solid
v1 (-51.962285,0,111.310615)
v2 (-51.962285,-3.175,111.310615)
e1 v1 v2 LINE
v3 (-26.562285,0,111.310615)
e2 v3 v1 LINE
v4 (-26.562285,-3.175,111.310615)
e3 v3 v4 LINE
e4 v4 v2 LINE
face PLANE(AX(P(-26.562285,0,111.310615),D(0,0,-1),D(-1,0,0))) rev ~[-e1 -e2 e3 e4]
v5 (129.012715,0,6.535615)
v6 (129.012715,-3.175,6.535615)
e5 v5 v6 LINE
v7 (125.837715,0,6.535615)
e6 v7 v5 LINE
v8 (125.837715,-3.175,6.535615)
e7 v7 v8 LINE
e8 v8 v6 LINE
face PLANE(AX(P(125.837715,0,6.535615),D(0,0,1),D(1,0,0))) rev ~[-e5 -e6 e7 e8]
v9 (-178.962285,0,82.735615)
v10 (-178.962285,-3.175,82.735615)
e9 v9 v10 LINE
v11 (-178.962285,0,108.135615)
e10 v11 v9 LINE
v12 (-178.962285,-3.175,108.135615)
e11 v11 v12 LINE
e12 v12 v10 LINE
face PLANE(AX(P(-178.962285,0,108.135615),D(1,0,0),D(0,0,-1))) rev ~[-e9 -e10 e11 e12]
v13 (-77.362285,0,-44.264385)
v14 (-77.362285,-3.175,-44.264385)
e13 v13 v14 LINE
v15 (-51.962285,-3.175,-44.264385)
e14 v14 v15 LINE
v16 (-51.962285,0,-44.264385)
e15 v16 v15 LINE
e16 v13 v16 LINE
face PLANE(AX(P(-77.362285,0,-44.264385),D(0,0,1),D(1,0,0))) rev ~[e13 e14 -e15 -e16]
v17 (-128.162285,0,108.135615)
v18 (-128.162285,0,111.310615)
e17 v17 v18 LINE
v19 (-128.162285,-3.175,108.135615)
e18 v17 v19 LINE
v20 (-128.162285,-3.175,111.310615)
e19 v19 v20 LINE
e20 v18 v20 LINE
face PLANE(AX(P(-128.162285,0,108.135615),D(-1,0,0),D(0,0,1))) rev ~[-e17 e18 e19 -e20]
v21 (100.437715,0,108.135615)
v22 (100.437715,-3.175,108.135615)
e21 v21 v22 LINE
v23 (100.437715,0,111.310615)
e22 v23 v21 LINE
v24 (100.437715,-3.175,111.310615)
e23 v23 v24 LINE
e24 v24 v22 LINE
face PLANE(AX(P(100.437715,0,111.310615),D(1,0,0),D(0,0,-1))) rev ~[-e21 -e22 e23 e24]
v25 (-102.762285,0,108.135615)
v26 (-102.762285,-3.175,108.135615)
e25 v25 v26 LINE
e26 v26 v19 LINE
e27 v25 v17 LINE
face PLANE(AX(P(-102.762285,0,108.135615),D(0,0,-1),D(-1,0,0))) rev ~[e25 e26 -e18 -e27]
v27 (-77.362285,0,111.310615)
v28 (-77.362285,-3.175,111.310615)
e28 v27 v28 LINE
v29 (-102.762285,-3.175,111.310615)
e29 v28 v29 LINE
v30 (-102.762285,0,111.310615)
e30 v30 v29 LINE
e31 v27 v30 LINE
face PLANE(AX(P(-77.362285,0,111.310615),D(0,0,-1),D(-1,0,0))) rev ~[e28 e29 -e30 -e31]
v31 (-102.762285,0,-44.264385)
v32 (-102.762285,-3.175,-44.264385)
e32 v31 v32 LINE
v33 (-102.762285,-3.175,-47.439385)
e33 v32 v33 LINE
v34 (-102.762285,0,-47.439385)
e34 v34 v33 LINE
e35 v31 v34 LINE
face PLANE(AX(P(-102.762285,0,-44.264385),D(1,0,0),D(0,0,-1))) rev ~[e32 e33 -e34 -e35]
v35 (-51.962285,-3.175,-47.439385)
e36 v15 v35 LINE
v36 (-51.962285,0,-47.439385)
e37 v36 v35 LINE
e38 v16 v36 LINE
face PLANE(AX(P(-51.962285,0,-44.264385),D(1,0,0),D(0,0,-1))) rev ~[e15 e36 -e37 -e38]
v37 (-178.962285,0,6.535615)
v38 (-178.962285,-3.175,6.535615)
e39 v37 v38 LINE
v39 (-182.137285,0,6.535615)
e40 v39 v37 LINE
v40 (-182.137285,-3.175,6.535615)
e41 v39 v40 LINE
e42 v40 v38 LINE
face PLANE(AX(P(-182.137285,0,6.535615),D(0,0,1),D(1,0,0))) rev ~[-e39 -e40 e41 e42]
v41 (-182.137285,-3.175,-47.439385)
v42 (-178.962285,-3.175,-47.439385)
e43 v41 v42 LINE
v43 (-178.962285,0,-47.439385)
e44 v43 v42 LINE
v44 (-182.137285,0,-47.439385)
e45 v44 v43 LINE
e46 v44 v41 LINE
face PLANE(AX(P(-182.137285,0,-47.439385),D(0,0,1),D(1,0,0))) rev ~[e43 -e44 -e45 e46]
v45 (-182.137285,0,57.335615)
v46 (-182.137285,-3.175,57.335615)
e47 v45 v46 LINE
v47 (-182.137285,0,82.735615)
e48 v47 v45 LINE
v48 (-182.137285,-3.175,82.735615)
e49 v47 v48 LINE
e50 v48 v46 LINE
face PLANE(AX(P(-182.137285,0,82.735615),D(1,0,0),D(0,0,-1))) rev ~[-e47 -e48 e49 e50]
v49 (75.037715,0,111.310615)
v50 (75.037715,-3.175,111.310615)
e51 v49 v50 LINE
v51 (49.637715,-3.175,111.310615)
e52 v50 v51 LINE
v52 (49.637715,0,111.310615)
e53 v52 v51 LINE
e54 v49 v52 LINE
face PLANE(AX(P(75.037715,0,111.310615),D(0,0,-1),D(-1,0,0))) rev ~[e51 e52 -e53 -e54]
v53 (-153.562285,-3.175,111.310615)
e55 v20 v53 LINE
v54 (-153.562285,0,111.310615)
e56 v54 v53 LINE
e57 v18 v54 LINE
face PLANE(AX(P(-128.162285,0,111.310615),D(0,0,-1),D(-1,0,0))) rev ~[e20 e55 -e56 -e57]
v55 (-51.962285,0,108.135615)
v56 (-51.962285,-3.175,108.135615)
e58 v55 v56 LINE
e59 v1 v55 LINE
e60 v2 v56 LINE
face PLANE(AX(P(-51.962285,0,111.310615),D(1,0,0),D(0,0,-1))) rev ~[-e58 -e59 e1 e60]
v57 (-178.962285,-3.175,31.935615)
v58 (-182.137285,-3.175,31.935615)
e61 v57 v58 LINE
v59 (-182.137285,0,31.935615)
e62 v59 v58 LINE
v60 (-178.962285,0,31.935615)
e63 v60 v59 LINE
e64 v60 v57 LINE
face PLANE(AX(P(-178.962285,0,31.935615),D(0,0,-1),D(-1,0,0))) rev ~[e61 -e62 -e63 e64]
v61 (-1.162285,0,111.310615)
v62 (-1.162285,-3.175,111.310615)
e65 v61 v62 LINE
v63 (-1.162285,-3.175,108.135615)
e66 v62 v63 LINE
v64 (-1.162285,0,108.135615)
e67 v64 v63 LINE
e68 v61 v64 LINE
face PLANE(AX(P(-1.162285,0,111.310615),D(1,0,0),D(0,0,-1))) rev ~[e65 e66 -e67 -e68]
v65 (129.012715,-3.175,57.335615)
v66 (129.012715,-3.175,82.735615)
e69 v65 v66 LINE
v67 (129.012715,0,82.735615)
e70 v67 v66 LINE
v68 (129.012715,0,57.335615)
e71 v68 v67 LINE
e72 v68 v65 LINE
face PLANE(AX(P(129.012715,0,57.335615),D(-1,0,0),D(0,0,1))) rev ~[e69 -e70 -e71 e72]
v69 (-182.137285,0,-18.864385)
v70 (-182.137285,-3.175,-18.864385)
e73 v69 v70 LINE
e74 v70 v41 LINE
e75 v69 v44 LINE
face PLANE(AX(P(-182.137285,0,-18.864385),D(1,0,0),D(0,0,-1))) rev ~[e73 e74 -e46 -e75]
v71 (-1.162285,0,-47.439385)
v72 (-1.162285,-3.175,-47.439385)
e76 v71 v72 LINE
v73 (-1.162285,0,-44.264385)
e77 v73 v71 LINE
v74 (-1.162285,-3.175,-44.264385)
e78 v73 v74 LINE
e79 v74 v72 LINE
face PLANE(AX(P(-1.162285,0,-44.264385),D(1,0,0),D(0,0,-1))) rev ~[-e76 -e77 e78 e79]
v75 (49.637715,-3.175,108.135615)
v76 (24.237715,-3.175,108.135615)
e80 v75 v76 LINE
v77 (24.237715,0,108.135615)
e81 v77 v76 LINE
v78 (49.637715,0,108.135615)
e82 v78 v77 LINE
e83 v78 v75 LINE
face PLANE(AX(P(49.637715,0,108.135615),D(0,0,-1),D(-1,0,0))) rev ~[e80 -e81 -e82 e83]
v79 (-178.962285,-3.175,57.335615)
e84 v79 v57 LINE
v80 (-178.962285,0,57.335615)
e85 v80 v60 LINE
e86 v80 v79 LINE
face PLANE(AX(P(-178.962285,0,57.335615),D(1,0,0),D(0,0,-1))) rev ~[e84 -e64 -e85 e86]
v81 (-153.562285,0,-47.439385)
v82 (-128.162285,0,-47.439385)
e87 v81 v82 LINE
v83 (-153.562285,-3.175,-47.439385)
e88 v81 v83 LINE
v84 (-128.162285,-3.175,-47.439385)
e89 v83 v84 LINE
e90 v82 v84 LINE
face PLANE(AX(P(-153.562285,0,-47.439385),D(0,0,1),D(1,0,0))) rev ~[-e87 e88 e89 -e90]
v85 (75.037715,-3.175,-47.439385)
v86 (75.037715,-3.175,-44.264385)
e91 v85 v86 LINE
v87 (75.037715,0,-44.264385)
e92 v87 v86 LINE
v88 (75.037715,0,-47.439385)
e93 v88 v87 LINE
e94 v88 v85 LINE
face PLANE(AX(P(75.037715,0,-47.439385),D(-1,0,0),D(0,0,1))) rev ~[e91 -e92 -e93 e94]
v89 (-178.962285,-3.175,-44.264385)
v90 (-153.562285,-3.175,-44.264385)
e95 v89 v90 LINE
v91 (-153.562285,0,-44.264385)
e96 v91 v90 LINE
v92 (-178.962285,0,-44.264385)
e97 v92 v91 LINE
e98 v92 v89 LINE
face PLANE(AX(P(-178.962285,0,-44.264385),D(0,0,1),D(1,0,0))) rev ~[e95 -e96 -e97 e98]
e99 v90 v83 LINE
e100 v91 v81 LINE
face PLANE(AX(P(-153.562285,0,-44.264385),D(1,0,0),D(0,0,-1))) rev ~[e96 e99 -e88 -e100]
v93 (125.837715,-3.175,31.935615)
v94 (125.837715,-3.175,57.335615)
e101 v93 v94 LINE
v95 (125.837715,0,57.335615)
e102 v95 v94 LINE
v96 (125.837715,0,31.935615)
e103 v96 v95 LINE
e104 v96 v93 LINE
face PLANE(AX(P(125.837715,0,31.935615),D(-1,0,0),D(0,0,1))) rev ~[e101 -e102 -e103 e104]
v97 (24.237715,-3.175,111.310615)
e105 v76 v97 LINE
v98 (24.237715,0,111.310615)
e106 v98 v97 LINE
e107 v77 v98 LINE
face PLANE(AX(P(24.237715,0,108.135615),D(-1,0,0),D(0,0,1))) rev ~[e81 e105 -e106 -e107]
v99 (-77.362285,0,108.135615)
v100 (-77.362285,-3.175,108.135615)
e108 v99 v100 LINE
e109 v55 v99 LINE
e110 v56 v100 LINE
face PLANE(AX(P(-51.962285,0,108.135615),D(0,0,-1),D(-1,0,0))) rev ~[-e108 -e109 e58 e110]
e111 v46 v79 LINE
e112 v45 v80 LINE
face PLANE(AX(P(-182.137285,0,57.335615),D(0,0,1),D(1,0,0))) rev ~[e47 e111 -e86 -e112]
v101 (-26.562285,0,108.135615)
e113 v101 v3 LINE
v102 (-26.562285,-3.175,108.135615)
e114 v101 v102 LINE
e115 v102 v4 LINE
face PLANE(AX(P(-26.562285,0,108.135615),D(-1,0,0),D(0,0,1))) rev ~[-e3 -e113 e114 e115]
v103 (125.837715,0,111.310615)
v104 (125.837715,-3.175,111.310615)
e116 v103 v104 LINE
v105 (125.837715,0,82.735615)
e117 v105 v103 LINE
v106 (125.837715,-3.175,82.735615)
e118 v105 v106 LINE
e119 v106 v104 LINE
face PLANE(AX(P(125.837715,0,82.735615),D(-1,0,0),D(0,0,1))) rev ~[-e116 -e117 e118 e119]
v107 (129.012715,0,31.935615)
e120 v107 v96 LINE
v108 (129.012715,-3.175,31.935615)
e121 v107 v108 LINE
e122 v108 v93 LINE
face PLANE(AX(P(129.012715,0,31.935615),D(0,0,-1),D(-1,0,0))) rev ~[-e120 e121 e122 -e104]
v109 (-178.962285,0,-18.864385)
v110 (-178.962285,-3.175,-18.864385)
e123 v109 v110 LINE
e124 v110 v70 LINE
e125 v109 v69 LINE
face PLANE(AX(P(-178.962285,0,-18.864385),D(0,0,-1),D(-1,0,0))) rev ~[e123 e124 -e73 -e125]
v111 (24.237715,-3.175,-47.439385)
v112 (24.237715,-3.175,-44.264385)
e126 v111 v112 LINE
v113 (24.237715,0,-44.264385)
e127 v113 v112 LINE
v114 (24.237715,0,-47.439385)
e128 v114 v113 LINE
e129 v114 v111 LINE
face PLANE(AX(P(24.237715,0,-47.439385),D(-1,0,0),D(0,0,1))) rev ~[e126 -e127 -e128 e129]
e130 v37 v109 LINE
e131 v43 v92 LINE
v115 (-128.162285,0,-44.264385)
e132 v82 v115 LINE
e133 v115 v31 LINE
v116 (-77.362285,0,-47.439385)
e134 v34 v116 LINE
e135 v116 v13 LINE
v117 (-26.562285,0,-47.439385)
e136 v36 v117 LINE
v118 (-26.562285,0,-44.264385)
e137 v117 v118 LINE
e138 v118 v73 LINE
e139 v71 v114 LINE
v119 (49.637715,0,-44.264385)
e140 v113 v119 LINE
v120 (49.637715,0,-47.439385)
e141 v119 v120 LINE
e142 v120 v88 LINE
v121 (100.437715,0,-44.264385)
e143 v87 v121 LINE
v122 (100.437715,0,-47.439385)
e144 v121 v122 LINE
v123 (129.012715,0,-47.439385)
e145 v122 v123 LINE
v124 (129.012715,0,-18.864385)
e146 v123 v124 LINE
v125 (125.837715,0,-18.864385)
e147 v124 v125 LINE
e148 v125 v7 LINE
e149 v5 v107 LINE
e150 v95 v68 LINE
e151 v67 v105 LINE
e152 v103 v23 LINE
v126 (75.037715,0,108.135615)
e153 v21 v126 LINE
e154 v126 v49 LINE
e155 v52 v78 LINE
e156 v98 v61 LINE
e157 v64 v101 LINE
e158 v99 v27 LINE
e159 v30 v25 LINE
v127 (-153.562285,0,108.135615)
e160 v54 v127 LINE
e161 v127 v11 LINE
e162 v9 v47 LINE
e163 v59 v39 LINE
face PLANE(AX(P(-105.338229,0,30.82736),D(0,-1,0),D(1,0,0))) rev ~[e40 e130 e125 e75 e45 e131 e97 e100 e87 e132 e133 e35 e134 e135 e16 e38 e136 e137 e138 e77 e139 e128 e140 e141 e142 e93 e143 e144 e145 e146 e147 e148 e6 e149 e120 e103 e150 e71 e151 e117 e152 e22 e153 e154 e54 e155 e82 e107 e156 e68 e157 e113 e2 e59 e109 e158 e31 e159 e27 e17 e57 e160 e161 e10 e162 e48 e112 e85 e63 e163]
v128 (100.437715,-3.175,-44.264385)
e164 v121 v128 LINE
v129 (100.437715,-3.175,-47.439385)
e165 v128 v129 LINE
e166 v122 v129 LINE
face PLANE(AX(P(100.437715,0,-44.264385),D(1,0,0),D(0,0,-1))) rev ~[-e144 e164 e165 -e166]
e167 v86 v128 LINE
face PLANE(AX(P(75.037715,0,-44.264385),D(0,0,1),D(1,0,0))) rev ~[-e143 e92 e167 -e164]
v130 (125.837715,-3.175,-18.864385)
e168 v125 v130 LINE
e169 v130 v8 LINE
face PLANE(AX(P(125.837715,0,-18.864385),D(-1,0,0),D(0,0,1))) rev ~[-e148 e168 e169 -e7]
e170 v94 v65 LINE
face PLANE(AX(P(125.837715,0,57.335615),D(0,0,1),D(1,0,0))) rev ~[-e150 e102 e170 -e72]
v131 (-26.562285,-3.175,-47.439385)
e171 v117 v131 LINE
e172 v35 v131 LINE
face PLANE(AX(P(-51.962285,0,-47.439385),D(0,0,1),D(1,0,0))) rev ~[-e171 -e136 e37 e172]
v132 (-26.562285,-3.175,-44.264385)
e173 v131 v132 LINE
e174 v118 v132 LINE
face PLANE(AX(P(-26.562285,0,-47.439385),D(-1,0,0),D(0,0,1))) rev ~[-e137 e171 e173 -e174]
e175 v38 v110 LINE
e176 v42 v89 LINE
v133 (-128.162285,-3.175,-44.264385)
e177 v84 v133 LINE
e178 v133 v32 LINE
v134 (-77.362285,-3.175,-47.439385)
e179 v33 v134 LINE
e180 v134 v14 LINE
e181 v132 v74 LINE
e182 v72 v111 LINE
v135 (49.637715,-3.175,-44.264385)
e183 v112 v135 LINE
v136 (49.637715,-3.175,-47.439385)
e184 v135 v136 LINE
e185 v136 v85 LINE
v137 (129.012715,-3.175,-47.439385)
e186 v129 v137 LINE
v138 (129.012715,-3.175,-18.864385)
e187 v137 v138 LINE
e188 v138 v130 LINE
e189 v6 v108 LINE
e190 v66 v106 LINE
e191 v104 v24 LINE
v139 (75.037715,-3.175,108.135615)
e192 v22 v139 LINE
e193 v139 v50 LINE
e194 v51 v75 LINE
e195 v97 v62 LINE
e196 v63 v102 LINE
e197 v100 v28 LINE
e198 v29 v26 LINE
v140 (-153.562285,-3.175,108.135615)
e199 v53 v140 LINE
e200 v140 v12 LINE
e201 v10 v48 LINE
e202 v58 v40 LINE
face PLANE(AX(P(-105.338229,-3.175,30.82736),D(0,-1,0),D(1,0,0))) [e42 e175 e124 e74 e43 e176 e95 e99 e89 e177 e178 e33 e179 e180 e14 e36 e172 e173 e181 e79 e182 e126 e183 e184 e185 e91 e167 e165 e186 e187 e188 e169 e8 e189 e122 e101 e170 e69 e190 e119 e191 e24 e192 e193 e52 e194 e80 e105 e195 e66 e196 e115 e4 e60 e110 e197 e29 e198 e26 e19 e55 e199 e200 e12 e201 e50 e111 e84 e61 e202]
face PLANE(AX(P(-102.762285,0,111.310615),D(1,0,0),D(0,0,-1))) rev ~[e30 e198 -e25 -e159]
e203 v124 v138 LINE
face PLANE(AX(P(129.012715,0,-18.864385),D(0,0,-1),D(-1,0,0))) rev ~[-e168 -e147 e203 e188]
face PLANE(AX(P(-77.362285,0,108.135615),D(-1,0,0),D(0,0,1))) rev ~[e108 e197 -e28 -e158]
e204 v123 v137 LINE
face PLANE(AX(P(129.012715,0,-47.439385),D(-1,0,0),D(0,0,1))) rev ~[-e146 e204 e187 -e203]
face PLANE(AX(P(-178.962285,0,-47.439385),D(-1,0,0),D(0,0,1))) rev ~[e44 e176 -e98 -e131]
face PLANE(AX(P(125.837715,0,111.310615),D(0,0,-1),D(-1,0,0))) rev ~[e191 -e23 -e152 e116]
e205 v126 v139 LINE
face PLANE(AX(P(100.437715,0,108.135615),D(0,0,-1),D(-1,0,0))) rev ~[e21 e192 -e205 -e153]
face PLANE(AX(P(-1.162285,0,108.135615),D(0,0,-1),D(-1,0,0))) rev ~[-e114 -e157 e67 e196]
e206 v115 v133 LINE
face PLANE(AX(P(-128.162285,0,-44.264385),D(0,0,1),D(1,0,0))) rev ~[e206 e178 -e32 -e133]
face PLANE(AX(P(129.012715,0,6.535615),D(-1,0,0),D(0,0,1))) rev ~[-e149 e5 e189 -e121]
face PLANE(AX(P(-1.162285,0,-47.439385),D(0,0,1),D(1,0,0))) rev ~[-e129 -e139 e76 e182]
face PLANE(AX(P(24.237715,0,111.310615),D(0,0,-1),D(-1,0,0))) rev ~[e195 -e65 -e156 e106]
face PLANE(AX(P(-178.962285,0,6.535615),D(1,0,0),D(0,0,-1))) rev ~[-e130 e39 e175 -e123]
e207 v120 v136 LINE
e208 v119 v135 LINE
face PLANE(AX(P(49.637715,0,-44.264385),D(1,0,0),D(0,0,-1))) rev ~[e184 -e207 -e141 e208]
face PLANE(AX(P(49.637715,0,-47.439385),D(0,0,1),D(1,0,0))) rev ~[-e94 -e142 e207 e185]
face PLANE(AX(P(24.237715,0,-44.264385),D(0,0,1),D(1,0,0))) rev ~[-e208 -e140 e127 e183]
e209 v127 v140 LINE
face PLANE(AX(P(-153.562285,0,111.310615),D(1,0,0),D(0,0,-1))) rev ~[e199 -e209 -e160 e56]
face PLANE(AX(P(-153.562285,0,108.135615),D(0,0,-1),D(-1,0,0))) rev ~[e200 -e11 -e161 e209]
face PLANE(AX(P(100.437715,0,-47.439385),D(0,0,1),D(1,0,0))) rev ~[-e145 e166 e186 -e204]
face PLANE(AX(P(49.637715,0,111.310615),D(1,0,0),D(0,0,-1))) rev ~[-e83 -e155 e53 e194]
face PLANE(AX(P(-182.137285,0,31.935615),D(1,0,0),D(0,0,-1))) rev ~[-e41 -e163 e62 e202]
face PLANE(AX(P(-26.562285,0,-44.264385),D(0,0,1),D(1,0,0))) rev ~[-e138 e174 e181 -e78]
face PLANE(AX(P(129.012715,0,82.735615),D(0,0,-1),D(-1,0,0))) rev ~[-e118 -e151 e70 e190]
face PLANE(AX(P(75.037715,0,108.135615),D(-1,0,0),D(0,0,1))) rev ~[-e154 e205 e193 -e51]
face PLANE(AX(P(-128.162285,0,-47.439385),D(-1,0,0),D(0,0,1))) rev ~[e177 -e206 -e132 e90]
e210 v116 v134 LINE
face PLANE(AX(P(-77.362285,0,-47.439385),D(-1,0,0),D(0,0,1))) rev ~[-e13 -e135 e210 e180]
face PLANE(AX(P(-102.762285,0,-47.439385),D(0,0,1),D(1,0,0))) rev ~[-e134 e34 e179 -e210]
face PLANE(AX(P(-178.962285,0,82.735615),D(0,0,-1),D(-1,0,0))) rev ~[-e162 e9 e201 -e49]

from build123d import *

# Parameters (mm, degrees)
F1_DEPTH = 3.175


# Not quite as in the source:
# - a length typed as a fraction of an inch, garbled in the dataset ("3 / 203.2 mm" for 3/8 in), is restored


with BuildPart() as f1:
    # F0 (on Front) → F1 (new body)
    with BuildSketch(Plane.XZ):
        Polygon((-178.9622853069, -44.2643848114), (-153.5622853069, -44.2643848114), (-153.5622853069, -47.4393848114), (-128.1622853069, -47.4393848114), (-128.1622853069, -44.2643848114), (-102.7622853069, -44.2643848114), (-102.7622853069, -47.4393848114), (-77.3622853069, -47.4393848114), (-77.3622853069, -44.2643848114), (-51.9622853069, -44.2643848114), (-51.9622853069, -47.4393848114), (-26.5622853069, -47.4393848114), (-26.5622853069, -44.2643848114), (-26.5622853069, 108.1356151886), (-26.5622853069, 111.3106151886), (-51.9622853069, 111.3106151886), (-51.9622853069, 108.1356151886), (-77.3622853069, 108.1356151886), (-77.3622853069, 111.3106151886), (-102.7622853069, 111.3106151886), (-102.7622853069, 108.1356151886), (-128.1622853069, 108.1356151886), (-128.1622853069, 111.3106151886), (-153.5622853069, 111.3106151886), (-153.5622853069, 108.1356151886), (-178.9622853069, 108.1356151886), (-178.9622853069, 82.7356151886), (-182.1372853069, 82.7356151886), (-182.1372853069, 57.3356151886), (-178.9622853069, 57.3356151886), (-178.9622853069, 31.9356151886), (-182.1372853069, 31.9356151886), (-182.1372853069, 6.5356151886), (-178.9622853069, 6.5356151886), (-178.9622853069, -18.8643848114), (-182.1372853069, -18.8643848114), (-182.1372853069, -44.2643848114), (-182.1372853069, -47.4393848114), (-178.9622853069, -47.4393848114), align=None)
        Polygon((-26.5622853069, 108.1356151886), (-26.5622853069, -44.2643848114), (-1.1622853069, -44.2643848114), (-1.1622853069, -47.4393848114), (24.2377146931, -47.4393848114), (24.2377146931, -44.2643848114), (49.6377146931, -44.2643848114), (49.6377146931, -47.4393848114), (75.0377146931, -47.4393848114), (75.0377146931, -44.2643848114), (100.4377146931, -44.2643848114), (100.4377146931, -47.4393848114), (125.8377146931, -47.4393848114), (129.0127146931, -47.4393848114), (129.0127146931, -44.2643848114), (129.0127146931, -18.8643848114), (125.8377146931, -18.8643848114), (125.8377146931, 6.5356151886), (129.0127146931, 6.5356151886), (129.0127146931, 31.9356151886), (125.8377146931, 31.9356151886), (125.8377146931, 57.3356151886), (129.0127146931, 57.3356151886), (129.0127146931, 82.7356151886), (125.8377146931, 82.7356151886), (125.8377146931, 108.1356151886), (125.8377146931, 111.3106151886), (100.4377146931, 111.3106151886), (100.4377146931, 108.1356151886), (75.0377146931, 108.1356151886), (75.0377146931, 111.3106151886), (49.6377146931, 111.3106151886), (49.6377146931, 108.1356151886), (24.2377146931, 108.1356151886), (24.2377146931, 111.3106151886), (-1.1622853069, 111.3106151886), (-1.1622853069, 108.1356151886), align=None)
    extrude(amount=F1_DEPTH)


solid = f1.part
